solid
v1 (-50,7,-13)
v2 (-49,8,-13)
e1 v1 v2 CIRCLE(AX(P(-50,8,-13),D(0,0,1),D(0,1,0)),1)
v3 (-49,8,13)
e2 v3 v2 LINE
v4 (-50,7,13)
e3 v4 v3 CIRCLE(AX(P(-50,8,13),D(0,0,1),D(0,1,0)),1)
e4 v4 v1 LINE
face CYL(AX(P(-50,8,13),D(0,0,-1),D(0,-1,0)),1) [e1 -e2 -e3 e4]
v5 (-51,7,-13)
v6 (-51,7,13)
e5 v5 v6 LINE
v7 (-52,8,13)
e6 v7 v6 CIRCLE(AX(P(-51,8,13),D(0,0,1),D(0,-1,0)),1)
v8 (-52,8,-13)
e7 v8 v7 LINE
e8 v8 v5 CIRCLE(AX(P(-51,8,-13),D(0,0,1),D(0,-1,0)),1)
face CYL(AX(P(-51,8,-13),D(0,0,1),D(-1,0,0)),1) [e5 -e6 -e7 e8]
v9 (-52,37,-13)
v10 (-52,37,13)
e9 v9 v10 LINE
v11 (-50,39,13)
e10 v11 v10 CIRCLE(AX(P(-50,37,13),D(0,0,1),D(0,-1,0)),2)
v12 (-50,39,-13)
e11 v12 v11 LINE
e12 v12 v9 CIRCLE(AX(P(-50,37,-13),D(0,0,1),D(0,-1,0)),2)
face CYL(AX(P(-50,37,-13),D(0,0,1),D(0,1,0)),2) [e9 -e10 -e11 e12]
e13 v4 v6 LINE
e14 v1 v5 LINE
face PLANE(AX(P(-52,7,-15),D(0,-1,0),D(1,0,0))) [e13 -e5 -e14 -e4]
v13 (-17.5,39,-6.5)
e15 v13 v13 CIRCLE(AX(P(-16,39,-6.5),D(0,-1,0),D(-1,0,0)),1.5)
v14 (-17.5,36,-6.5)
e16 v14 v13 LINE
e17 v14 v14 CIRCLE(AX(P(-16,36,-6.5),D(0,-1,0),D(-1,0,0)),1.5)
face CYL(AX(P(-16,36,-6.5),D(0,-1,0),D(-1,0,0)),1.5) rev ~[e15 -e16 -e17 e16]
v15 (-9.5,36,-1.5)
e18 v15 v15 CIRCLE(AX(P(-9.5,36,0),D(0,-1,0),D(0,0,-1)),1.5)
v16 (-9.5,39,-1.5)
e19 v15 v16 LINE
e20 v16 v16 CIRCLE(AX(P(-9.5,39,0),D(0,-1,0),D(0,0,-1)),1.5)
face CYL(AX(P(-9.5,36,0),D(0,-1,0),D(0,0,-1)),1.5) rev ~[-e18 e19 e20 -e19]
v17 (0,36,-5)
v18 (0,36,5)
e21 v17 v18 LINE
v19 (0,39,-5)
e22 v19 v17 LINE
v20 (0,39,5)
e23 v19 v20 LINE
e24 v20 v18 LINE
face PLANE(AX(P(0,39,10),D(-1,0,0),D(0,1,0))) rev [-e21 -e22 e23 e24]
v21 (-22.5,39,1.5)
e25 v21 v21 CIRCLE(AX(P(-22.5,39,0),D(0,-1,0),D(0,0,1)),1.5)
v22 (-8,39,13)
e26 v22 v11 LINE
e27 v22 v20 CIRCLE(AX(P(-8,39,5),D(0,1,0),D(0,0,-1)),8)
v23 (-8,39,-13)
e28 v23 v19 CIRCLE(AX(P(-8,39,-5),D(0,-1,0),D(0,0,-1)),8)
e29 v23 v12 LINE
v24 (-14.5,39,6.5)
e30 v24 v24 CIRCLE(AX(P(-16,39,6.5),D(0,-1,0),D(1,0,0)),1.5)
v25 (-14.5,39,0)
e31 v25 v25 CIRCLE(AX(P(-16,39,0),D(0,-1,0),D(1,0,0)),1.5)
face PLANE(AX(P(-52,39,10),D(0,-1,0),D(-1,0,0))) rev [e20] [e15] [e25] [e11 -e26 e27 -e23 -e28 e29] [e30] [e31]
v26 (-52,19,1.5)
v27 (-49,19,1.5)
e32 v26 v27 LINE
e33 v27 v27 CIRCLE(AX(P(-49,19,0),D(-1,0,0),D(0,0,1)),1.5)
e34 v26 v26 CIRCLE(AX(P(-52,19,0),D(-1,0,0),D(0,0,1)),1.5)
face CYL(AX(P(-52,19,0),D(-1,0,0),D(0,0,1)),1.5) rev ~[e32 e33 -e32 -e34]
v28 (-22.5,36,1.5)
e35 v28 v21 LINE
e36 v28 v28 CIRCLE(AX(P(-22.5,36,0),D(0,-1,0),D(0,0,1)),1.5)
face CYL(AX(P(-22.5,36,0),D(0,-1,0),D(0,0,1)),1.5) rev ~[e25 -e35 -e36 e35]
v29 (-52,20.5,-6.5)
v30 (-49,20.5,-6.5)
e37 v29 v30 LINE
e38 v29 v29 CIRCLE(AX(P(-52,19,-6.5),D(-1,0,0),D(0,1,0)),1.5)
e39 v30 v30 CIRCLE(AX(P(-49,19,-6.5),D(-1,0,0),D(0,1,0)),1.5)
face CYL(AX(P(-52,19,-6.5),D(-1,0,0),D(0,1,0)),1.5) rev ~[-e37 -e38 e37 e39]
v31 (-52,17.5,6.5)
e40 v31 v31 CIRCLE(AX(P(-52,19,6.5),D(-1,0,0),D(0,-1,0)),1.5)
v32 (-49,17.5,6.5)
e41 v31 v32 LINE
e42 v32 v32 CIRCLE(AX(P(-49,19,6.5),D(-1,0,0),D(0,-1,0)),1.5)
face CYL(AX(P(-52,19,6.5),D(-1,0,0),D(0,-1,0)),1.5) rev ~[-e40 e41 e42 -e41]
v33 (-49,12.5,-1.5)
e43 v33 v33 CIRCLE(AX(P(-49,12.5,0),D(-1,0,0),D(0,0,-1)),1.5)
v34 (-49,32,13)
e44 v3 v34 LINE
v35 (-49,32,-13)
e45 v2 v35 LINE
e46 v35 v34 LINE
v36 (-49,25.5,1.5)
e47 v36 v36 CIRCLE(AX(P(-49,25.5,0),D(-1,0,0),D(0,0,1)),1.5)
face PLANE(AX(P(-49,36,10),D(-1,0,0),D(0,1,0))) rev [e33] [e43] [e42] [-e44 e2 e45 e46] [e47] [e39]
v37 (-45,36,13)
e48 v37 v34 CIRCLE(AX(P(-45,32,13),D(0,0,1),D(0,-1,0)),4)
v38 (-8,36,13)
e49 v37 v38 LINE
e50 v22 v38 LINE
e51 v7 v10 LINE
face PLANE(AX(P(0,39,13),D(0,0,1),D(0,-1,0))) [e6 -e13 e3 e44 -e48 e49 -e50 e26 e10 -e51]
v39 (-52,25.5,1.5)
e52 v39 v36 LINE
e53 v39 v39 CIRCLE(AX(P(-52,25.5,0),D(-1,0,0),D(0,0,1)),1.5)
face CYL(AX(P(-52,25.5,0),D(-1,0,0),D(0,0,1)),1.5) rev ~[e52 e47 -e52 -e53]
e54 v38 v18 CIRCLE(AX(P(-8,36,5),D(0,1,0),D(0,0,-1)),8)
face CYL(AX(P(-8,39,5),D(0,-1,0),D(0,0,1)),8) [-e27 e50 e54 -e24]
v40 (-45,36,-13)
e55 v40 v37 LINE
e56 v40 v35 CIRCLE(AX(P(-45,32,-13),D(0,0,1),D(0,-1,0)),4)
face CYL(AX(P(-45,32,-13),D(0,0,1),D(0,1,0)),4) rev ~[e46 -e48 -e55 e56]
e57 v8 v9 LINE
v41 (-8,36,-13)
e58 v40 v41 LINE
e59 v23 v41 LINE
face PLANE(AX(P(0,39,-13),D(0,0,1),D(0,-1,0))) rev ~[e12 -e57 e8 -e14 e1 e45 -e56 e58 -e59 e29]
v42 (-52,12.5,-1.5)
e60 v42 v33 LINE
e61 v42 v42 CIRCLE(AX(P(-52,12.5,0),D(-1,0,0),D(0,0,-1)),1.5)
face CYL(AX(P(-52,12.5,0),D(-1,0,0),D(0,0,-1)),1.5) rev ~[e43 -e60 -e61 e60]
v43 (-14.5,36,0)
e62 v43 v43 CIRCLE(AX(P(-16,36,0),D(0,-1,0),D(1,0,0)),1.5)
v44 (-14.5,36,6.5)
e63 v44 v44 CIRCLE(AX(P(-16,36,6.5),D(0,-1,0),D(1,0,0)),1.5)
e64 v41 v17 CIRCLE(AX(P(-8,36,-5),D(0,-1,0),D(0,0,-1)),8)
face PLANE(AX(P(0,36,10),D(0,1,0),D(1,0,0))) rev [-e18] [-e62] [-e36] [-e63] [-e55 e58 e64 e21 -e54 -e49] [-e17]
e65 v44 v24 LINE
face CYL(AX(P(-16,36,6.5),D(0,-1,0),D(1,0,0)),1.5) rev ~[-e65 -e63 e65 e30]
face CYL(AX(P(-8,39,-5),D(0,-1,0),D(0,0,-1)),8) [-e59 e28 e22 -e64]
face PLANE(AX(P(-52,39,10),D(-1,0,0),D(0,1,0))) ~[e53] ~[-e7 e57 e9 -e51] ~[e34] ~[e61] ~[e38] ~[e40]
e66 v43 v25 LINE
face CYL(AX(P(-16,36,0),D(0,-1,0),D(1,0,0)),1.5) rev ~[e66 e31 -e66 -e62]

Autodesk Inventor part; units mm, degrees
ref_plane "YZ Plane" through (0, 0, 0) normal (1, 0, 0) x (0, 1, 0)
ref_plane "XZ Plane" through (0, 0, 0) normal (0, 1, 0) x (-1, 0, 0)
ref_plane "XY Plane" through (0, 0, 0) normal (0, 0, 1) x (1, 0, 0)
sketch "Sketch1" plane through (0, 0, 0) normal (0, 0, 1) x (1, 0, 0)
  line L0 (0, 0) -> (-49, 0)
  line L1 (-49, 0) -> (-49, 18)
  line L2 (-49, 18) -> (0, 18) construction
  line L3 (-49, 18) -> (-52, 18)
  line L4 (-52, 18) -> (-52, -3)
  line L5 (-52, -3) -> (0, -3)
  line L6 (0, -3) -> (0, 0)
  dimension "d0" = 18
  dimension "d1" = 3
  dimension "d2" = 3
  dimension "d3" = 52
extrude "Extrusion1" add sketch "Sketch1" along normal blind 10
mirror "Mirror1" about plane through (-32.0411, 1.4589, 0) normal (0, 0, -1) of "Extrusion1"
mirror "Mirror2" about plane through (-49, 18, 0) normal (0, 1, 0) of "Extrusion1", "Mirror1"
sketch "Sketch4" plane through (0, -3, -10) normal (0, 0, -1) x (-1, 0, 0)
  line L0 (0, 3) -> (49, 3) projected
  line L1 (0, 0) -> (0, 3) projected
  line L2 (52, 0) -> (0, 0) projected
  line L3 (52, 42) -> (52, 0) projected
  line L4 (52, 42) -> (0, 42) projected
  line L5 (0, 42) -> (0, 39) projected
  line L6 (0, 39) -> (49, 39) projected
  line L7 (49, 39) -> (49, 3) projected
  line L8 (0, 3) -> (49, 3) projected
  line L9 (0, 0) -> (0, 3) projected
  line L10 (52, 0) -> (0, 0) projected
  line L11 (52, 42) -> (52, 0) projected
  line L12 (52, 42) -> (0, 42) projected
  line L13 (0, 42) -> (0, 39) projected
  line L14 (0, 39) -> (49, 39) projected
  line L15 (49, 39) -> (49, 3) projected
extrude "Extrusion4" add sketch "Sketch4" along normal blind 5
mirror "Mirror3" about plane through (0, 0, 0) normal (0, 0, 1) of "Extrusion4"
sketch "Sketch11" plane through (-52, -3, -15) normal (0, -1, 0) x (1, 0, 0)
  line L0 (52, 0) -> (52, 30) projected
  line L1 (52, 30) -> (0, 30) projected
  line L2 (0, 0) -> (0, 30) projected
  line L3 (52, 0) -> (0, 0) projected
  line L4 (52, 0) -> (52, 30) projected
  line L5 (52, 30) -> (0, 30) projected
  line L6 (0, 0) -> (0, 30) projected
  line L7 (52, 0) -> (0, 0) projected
  point P0 (52, 15)
extrude "Extrusion11" cut sketch "Sketch11" against normal blind 10
sketch "Sketch13" plane through (0, 36, -15) normal (1, 0, 0) x (0, 0, -1)
  line L0 (-30, 3) -> (-28, 3)
  line L1 (-28, 3) -> (-28, -29)
  line L2 (-28, -29) -> (-30, -29)
  line L3 (-30, -29) -> (-30, 3)
  line L4 (-30, -29) -> (0, -29) projected
  point P0 (-15, -36)
  dimension "d65" = 2
extrude "Extrusion13" cut sketch "Sketch13" against normal up to next
mirror "Mirror4" about plane through (0, 0, 0) normal (0, 0, 1) of "Extrusion13"
sketch "Sketch14" plane through (-52, 7, 13) normal (-1, 0, 0) x (0, 0, 1)
  line L0 (-26, 32) -> (-26, 0) projected
  line L1 (-26, 0) -> (0, 0) projected
  line L2 (0, 32) -> (-26, 32) projected
  circle A0 centre (-13, 12) radius 6.5 construction
  line L3 (-13, 12) -> (-26, 12) construction
  line L4 (-13, 12) -> (-13, 32) construction
  circle A1 centre (-13, 12) radius 1.5
  circle A2 centre (-13, 18.5) radius 1.5
  point P0 (-13, -7)
  point P1 (-13, 0)
  dimension "d68" = 13
  dimension "d69" = 20
  dimension "d71" = 3
  dimension "d72" = 3
extrude "Extrusion14" cut sketch "Sketch14" against normal up to next
pattern_circular "Circular Pattern6" count 4 over 360 about axis through (-52, 19, 0) along (1, 0, 0) of "Extrusion14"
sketch "Sketch15" plane through (-49, 36, 13) normal (0, -1, 0) x (1, 0, 0)
  line L0 (49, -26) -> (49, 0) projected
  line L1 (49, 0) -> (0, 0) projected
  circle A0 centre (33, -13) radius 6.5 construction
  line L2 (33, -13) -> (33, 0) construction
  circle A1 centre (33, -6.5) radius 1.5
  circle A2 centre (33, -13) radius 1.5
  point P0 (49, -13)
  point P1 (49, -13)
  dimension "d78" = 13
  dimension "d79" = 16
  dimension "d80" = 3
  dimension "d81" = 3
extrude "Extrusion15" cut sketch "Sketch15" against normal up to next
pattern_circular "Circular Pattern7" count 4 over 360 about axis through (-16, 36, 0) along (0, 1, 0) of "Extrusion15"
fillet "Fillet1" radius 8 2 edges at (0, 37.5, -13) (0, 37.5, 13)
sketch "Sketch18" plane through (-52, 39, 13) normal (0, 1, 0) x (1, 0, 0)
  arc A0 (44, 0) -> (52, 8) centre (44, 8) ccw projected
  line L0 (52, 8) -> (52, 18) projected
  arc A1 (52, 18) -> (44, 26) centre (44, 18) ccw projected
  line L1 (44, 26) -> (0, 26) projected
  line L2 (0, 0) -> (0, 26) projected
  line L3 (0, 0) -> (44, 0) projected
  circle A2 centre (36, 13) radius 1.5 projected
  circle A3 centre (36, 6.5) radius 1.5 projected
  circle A4 centre (29.5, 13) radius 1.5 projected
  circle A5 centre (42.5, 13) radius 1.5 projected
  circle A6 centre (36, 19.5) radius 1.5 projected
  point P0 (52, 13)
  dimension "d93" = 26
fillet "Fillet2" radius 4 1 edges at (-49, 36, 0)
fillet "Fillet3" radius 2 1 edges at (-52, 39, 0)
fillet "Fillet4" radius 1 2 edges at (-49, 7, 0) (-52, 7, 0)
equation "\"d72\" = d71"
properties part number "L_micro_sergei_dines"
